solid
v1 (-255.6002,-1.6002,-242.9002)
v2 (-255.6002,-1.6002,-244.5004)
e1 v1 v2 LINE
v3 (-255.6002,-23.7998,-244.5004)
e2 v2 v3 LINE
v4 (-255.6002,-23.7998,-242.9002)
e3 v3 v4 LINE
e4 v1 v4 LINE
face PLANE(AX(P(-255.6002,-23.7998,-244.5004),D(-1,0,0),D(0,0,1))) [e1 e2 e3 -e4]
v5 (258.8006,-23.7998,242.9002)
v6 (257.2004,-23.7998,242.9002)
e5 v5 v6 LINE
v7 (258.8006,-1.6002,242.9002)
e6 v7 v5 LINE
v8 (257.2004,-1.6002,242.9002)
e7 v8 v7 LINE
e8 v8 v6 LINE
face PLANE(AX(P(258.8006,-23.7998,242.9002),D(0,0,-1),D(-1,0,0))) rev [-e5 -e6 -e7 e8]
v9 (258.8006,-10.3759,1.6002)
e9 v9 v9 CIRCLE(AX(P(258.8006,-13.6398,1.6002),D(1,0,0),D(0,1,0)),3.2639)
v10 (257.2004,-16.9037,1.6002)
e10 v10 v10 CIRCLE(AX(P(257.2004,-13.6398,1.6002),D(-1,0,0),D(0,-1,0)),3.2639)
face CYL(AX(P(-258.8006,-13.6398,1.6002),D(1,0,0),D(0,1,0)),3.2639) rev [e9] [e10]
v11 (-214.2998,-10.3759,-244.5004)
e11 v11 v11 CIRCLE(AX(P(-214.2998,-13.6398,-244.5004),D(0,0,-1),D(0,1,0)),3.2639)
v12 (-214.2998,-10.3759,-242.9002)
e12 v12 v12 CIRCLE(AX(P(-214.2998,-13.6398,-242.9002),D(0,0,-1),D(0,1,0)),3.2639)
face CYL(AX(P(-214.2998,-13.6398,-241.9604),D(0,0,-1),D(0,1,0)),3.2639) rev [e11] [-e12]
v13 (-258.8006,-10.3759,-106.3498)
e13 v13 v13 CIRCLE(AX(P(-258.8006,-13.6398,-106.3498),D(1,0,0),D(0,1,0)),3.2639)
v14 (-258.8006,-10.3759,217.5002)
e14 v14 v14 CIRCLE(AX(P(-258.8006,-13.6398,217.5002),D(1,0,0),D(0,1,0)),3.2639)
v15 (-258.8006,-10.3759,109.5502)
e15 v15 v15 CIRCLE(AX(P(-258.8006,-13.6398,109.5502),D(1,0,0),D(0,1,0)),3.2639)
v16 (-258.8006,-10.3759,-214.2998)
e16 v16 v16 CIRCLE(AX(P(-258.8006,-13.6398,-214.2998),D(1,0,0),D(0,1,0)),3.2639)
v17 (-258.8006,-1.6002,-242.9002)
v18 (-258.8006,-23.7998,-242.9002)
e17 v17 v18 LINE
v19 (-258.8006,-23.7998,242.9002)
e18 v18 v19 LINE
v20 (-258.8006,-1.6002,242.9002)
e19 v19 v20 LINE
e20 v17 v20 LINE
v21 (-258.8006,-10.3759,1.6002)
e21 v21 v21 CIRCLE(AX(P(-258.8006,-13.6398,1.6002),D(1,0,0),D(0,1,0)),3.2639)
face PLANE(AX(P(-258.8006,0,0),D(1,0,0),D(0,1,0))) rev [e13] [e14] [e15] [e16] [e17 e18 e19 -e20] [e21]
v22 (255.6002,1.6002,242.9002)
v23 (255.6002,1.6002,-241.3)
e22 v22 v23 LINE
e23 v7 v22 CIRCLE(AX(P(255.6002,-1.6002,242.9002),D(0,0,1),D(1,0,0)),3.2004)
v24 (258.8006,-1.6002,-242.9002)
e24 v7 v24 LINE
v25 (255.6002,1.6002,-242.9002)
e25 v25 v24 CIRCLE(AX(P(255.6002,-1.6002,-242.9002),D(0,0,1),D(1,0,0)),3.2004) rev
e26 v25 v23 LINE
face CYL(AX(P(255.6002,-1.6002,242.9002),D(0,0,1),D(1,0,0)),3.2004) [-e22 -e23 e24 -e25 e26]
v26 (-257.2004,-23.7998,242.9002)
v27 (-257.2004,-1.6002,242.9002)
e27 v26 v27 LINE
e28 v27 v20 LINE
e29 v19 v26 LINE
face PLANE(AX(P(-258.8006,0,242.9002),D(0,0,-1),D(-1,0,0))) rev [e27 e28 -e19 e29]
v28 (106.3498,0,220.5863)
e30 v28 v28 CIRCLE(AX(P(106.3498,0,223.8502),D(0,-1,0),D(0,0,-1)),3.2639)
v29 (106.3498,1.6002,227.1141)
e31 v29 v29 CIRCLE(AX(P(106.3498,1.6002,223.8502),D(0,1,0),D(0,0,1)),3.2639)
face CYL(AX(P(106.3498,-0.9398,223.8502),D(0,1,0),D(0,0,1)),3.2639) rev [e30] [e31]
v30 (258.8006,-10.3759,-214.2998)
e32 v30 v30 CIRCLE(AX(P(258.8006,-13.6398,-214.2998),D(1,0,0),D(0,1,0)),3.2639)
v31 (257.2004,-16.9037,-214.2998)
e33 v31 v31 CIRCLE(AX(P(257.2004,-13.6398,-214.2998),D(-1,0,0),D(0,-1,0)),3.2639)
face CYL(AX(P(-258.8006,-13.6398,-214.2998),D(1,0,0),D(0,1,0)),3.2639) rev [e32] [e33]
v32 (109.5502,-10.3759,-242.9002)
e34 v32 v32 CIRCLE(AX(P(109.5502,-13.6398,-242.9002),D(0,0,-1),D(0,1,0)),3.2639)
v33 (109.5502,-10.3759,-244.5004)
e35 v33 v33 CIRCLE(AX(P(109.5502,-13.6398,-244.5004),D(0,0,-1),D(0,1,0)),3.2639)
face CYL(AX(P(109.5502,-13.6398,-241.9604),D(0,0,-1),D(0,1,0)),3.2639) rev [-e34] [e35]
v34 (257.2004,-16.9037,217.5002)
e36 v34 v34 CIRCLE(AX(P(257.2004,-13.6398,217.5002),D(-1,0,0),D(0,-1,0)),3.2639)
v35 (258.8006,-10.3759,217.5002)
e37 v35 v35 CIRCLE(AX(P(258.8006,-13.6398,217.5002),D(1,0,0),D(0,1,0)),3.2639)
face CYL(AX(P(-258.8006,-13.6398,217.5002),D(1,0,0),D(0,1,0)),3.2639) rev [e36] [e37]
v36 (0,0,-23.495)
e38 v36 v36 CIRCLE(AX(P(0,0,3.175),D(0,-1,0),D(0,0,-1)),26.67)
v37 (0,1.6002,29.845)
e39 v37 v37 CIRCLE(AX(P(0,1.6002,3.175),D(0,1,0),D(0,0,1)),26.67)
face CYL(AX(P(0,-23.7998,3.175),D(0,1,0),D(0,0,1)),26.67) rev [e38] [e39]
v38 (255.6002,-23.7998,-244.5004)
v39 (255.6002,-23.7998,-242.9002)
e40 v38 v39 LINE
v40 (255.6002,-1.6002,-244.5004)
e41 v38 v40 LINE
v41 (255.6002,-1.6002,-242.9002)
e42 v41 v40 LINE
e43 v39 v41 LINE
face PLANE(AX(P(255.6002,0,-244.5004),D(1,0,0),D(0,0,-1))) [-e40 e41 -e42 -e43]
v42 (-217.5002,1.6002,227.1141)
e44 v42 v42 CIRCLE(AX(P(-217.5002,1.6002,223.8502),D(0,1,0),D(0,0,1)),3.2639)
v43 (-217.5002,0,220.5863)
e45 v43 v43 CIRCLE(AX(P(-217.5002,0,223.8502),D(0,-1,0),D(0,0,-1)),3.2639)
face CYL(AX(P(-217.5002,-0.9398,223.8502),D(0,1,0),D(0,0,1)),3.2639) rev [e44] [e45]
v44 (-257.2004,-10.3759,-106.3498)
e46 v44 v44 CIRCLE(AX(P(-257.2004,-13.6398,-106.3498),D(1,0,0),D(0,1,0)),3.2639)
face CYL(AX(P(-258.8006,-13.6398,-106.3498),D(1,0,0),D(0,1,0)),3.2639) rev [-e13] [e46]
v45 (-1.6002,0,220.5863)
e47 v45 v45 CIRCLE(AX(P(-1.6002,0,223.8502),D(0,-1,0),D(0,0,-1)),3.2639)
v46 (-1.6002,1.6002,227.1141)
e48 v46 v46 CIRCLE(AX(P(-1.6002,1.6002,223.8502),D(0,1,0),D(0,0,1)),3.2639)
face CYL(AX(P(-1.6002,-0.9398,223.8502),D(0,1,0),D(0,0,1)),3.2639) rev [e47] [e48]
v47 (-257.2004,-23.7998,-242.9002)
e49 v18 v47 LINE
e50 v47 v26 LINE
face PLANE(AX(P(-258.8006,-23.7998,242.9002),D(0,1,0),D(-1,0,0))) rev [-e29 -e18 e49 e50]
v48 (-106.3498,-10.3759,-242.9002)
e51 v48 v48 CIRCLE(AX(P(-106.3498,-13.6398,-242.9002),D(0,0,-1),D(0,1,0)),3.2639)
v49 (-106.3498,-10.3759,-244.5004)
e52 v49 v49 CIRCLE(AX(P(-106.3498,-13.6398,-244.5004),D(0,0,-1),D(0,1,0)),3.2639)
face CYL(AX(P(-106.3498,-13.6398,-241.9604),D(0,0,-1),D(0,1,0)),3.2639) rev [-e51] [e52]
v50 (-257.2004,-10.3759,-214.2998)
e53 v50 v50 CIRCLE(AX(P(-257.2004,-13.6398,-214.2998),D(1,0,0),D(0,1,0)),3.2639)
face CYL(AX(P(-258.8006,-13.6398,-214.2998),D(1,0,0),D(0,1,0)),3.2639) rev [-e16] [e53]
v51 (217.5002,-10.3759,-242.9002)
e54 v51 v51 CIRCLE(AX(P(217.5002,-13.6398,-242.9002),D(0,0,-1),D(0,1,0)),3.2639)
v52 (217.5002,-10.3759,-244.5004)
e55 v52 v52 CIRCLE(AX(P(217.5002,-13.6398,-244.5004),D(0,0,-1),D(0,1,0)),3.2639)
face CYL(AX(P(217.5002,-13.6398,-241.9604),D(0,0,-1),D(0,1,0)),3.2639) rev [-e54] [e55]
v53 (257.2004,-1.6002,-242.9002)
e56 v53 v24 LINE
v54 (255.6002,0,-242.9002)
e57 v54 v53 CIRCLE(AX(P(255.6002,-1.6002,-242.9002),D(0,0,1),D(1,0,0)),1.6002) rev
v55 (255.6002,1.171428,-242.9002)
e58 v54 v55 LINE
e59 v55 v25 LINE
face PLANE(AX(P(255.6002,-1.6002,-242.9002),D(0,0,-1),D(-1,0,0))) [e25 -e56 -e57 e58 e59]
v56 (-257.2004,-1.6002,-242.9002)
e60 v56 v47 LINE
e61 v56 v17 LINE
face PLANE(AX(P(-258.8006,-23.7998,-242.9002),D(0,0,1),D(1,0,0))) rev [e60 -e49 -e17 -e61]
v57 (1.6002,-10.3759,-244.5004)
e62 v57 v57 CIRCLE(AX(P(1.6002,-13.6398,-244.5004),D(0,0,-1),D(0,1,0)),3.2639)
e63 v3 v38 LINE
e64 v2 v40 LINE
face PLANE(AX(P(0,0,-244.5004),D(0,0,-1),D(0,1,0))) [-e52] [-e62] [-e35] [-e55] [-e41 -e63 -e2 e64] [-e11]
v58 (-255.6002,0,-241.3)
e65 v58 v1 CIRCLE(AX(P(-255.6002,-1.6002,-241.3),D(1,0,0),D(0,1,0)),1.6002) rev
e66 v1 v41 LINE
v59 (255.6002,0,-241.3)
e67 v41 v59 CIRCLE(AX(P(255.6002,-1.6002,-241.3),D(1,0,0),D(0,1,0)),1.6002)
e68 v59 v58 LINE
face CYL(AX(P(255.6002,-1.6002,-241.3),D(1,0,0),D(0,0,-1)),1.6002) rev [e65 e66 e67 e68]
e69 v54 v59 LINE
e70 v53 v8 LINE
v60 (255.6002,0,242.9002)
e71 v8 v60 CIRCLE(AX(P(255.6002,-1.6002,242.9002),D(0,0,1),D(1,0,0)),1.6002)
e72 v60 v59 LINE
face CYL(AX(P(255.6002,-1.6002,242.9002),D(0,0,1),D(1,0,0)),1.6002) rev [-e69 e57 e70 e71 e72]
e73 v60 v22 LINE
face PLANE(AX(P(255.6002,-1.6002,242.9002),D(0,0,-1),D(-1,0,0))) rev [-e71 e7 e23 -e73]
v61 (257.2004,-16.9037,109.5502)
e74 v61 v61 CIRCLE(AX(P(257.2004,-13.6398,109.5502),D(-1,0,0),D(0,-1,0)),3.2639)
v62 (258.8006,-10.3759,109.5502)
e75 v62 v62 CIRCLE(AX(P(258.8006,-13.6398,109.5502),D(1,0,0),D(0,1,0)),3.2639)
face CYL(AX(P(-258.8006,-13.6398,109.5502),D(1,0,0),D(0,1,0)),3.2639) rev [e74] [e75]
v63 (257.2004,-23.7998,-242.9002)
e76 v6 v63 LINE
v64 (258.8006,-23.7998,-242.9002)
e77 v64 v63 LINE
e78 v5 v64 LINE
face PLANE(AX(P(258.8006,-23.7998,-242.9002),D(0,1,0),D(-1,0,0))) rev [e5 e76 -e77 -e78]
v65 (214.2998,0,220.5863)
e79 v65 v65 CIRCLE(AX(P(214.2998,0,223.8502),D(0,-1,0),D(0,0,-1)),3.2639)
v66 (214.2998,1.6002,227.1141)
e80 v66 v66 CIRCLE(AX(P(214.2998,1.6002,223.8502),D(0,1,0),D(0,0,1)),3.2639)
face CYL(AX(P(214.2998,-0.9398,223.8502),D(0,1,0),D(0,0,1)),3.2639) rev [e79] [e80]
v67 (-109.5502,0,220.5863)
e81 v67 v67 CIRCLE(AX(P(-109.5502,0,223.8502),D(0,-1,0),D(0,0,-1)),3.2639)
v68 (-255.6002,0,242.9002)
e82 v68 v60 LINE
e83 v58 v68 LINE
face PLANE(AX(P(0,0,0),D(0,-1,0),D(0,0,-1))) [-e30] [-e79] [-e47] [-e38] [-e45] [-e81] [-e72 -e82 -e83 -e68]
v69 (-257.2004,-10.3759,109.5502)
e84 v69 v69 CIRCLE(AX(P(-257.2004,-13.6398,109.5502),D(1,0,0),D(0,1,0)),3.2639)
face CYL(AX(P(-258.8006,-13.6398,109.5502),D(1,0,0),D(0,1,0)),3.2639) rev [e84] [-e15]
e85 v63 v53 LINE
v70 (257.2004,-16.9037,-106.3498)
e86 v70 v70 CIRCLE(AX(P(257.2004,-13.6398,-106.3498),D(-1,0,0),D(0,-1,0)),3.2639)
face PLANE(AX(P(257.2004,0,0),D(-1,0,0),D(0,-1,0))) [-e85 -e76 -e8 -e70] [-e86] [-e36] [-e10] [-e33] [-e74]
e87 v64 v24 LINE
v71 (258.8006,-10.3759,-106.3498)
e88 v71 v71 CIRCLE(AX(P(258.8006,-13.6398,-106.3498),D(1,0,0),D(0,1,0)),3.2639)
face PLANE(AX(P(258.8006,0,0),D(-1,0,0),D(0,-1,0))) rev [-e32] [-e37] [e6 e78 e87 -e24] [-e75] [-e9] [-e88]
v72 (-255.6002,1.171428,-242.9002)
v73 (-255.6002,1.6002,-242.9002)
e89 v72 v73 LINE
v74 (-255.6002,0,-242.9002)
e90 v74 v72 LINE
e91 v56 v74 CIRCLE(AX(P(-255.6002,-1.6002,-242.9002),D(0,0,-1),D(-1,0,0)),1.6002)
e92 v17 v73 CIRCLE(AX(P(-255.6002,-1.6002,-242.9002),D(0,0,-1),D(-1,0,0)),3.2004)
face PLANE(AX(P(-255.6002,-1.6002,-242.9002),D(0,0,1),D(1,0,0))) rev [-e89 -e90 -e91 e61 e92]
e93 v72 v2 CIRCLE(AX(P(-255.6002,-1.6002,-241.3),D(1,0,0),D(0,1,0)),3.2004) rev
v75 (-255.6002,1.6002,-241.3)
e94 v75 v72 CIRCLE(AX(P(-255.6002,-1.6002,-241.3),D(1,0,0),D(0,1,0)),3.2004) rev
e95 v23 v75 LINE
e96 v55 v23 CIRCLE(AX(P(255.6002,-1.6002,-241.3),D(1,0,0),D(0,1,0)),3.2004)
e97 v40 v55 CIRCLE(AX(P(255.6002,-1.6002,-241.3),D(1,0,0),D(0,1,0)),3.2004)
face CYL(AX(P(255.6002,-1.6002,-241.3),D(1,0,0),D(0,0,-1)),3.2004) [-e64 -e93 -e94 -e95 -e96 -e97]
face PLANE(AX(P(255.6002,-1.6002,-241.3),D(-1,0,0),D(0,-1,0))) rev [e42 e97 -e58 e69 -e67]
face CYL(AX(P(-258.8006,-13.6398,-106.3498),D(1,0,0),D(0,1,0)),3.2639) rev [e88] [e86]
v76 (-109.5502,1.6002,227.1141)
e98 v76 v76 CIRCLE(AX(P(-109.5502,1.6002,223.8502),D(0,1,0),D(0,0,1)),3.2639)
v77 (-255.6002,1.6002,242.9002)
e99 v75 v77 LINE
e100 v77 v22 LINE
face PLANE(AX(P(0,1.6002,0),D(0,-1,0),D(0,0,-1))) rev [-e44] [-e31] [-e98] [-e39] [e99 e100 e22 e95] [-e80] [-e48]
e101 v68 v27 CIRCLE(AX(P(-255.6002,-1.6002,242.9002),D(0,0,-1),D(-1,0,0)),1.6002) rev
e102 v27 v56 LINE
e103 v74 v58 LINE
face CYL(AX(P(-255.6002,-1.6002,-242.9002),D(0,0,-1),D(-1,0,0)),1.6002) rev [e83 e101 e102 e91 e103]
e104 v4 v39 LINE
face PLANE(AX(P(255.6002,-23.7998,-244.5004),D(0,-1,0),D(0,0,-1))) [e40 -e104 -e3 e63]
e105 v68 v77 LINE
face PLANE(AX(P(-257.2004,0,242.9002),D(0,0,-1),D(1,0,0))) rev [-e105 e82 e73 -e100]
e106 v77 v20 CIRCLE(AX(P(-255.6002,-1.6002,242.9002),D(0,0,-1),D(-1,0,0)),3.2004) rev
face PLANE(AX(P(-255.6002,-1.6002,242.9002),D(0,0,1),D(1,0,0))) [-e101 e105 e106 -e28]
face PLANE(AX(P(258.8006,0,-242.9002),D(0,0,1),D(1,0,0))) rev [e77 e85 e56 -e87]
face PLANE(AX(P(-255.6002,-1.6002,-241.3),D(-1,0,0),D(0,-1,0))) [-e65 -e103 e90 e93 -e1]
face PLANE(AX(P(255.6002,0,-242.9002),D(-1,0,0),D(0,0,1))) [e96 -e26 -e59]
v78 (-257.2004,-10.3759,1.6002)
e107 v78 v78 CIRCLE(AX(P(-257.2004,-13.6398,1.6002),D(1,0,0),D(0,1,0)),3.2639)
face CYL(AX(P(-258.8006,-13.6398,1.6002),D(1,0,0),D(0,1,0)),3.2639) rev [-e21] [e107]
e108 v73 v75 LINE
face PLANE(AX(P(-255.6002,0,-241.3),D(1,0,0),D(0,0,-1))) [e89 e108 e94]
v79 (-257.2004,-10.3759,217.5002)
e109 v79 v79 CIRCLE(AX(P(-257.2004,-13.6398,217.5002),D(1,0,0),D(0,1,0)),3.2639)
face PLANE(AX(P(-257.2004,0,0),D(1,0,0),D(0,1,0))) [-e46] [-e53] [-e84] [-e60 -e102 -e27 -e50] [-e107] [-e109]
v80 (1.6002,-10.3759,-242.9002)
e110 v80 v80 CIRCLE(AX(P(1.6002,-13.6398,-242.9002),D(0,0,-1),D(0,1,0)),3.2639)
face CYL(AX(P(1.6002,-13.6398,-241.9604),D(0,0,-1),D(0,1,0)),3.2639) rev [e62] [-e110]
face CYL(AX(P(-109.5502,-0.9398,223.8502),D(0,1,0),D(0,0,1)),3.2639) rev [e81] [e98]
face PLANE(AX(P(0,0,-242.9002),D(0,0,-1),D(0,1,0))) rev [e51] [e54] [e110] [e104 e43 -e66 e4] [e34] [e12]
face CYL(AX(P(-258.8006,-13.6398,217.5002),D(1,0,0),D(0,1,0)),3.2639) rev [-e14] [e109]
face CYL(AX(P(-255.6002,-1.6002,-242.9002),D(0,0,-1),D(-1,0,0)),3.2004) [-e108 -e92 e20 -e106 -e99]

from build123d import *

# Parameters (mm, degrees)
SKETCH1_W                    = 514.4008
SKETCH1_H                    = 485.8004
BOSS_EXTRUDE1_DEPTH          = 1.6002
EDGE_FLANGE1_STRIP_W         = 9.6012
EDGE_FLANGE1_STRIP_H         = 1.6002
EDGE_FLANGE1_STRIP_CUT_DEPTH = 485.8004
EDGE_FLANGE1_DEPTH           = 485.8004
EDGE_FLANGE2_STRIP_W         = 9.6012
EDGE_FLANGE2_STRIP_H         = 1.6002
EDGE_FLANGE2_STRIP_CUT_DEPTH = 485.8004
EDGE_FLANGE2_DEPTH           = 485.8004
EDGE_FLANGE4_STRIP_W         = 9.6012
EDGE_FLANGE4_STRIP_H         = 1.6002
EDGE_FLANGE4_STRIP_CUT_DEPTH = 511.2004
EDGE_FLANGE4_DEPTH           = 511.2004
SKETCH18_R                   = 3.2639
CUT_EXTRUDE1_DEPTH           = 573.937935837
SKETCH19_R                   = 3.2639
CUT_EXTRUDE2_DEPTH           = 2.54
SKETCH20_R                   = 3.2639
CUT_EXTRUDE3_DEPTH           = 2.54
SKETCH21_R                   = 26.67
CUT_EXTRUDE4_DEPTH           = 357.936067329


# Sheet-metal steps are written as plain solids
with BuildPart() as part:
    # Sketch1 → Boss-Extrude1 (new body)
    with BuildSketch(Plane(origin=(0, 0, 0), x_dir=(1, 0, 0), z_dir=(0, 1, 0))):
        Rectangle(SKETCH1_W, SKETCH1_H)
    extrude(amount=BOSS_EXTRUDE1_DEPTH)

    # Edge-Flange1 strip (across the edge) → Edge-Flange1 strip cut (cut)
    with BuildSketch(Plane(origin=(-257.2004, 0, 242.9002), x_dir=(1, 0, 0), z_dir=(0, 0, -1))):
        with Locations((-3.2004, -0.8001)):
            Rectangle(EDGE_FLANGE1_STRIP_W, EDGE_FLANGE1_STRIP_H)
    extrude(amount=EDGE_FLANGE1_STRIP_CUT_DEPTH, mode=Mode.SUBTRACT)

    # Edge-Flange1 section (across the edge) → Edge-Flange1 (add)
    with BuildSketch(Plane(origin=(-257.2004, 0, 242.9002), x_dir=(1, 0, 0), z_dir=(0, 0, -1))):
        with BuildLine():
            Line((-1.6002, 1.6002), (-1.6002, 23.7998))
            Line((-1.6002, 23.7998), (0, 23.7998))
            Line((0, 23.7998), (0, 1.6002))
            ThreePointArc((0, 1.6002), (0.468687729, 0.468687729), (1.6002, 0))
            Line((1.6002, 0), (1.6002, -1.6002))
            ThreePointArc((1.6002, -1.6002), (-0.662824543, -0.662824543), (-1.6002, 1.6002))
        make_face()
    extrude(amount=EDGE_FLANGE1_DEPTH)

    # Edge-Flange2 strip (across the edge) → Edge-Flange2 strip cut (cut)
    with BuildSketch(Plane(origin=(257.2004, 0, -242.9002), x_dir=(-1, 0, 0), z_dir=(0, 0, 1))):
        with Locations((-3.2004, -0.8001)):
            Rectangle(EDGE_FLANGE2_STRIP_W, EDGE_FLANGE2_STRIP_H)
    extrude(amount=EDGE_FLANGE2_STRIP_CUT_DEPTH, mode=Mode.SUBTRACT)

    # Edge-Flange2 section (across the edge) → Edge-Flange2 (add)
    with BuildSketch(Plane(origin=(257.2004, 0, -242.9002), x_dir=(-1, 0, 0), z_dir=(0, 0, 1))):
        with BuildLine():
            Line((-1.6002, 1.6002), (-1.6002, 23.7998))
            Line((-1.6002, 23.7998), (0, 23.7998))
            Line((0, 23.7998), (0, 1.6002))
            ThreePointArc((0, 1.6002), (0.468687729, 0.468687729), (1.6002, 0))
            Line((1.6002, 0), (1.6002, -1.6002))
            ThreePointArc((1.6002, -1.6002), (-0.662824543, -0.662824543), (-1.6002, 1.6002))
        make_face()
    extrude(amount=EDGE_FLANGE2_DEPTH)

    # Edge-Flange4 strip (across the edge) → Edge-Flange4 strip cut (cut)
    with BuildSketch(Plane(origin=(-255.6002, 0, -242.9002), x_dir=(0, 0, 1), z_dir=(1, 0, 0))):
        with Locations((-3.2004, -0.8001)):
            Rectangle(EDGE_FLANGE4_STRIP_W, EDGE_FLANGE4_STRIP_H)
    extrude(amount=EDGE_FLANGE4_STRIP_CUT_DEPTH, mode=Mode.SUBTRACT)

    # Edge-Flange4 section (across the edge) → Edge-Flange4 (add)
    with BuildSketch(Plane(origin=(-255.6002, 0, -242.9002), x_dir=(0, 0, 1), z_dir=(1, 0, 0))):
        with BuildLine():
            Line((-1.6002, 1.6002), (-1.6002, 23.7998))
            Line((-1.6002, 23.7998), (0, 23.7998))
            Line((0, 23.7998), (0, 1.6002))
            ThreePointArc((0, 1.6002), (0.468687729, 0.468687729), (1.6002, 0))
            Line((1.6002, 0), (1.6002, -1.6002))
            ThreePointArc((1.6002, -1.6002), (-0.662824543, -0.662824543), (-1.6002, 1.6002))
        make_face()
    extrude(amount=EDGE_FLANGE4_DEPTH)

    # Sketch18 → Cut-Extrude1 (cut, through all)
    with BuildSketch(Plane(origin=(258.8006, 0, 0), x_dir=(0, 0, -1), z_dir=(1, 0, 0))):
        with Locations(Location((-217.5002, -13.6398, 0), (0, 0, 90))):
            Circle(SKETCH18_R)
        with Locations(Location((-109.5502, -13.6398, 0), (0, 0, 90))):
            Circle(SKETCH18_R)
        with Locations(Location((-1.6002, -13.6398, 0), (0, 0, 90))):
            Circle(SKETCH18_R)
        with Locations(Location((106.3498, -13.6398, 0), (0, 0, 90))):
            Circle(SKETCH18_R)
        with Locations(Location((214.2998, -13.6398, 0), (0, 0, 90))):
            Circle(SKETCH18_R)
    extrude(amount=-CUT_EXTRUDE1_DEPTH, mode=Mode.SUBTRACT)

    # Sketch19 → Cut-Extrude2 (cut)
    with BuildSketch(Plane(origin=(0, 0, -244.5004), x_dir=(-1, 0, 0), z_dir=(0, 0, -1))):
        with Locations(Location((-217.5002, -13.6398, 0), (0, 0, 90))):
            Circle(SKETCH19_R)
        with Locations(Location((-109.5502, -13.6398, 0), (0, 0, 90))):
            Circle(SKETCH19_R)
        with Locations(Location((-1.6002, -13.6398, 0), (0, 0, 90))):
            Circle(SKETCH19_R)
        with Locations(Location((106.3498, -13.6398, 0), (0, 0, 90))):
            Circle(SKETCH19_R)
        with Locations(Location((214.2998, -13.6398, 0), (0, 0, 90))):
            Circle(SKETCH19_R)
    extrude(amount=-CUT_EXTRUDE2_DEPTH, mode=Mode.SUBTRACT)

    # Sketch20 → Cut-Extrude3 (cut)
    with BuildSketch(Plane(origin=(0, 1.6002, 0), x_dir=(1, 0, 0), z_dir=(0, 1, 0))):
        with Locations(Location((-217.5002, -223.8502, 0), (0, 0, 270))):
            Circle(SKETCH20_R)
        with Locations(Location((-109.5502, -223.8502, 0), (0, 0, 270))):
            Circle(SKETCH20_R)
        with Locations(Location((-1.6002, -223.8502, 0), (0, 0, 270))):
            Circle(SKETCH20_R)
        with Locations(Location((106.3498, -223.8502, 0), (0, 0, 270))):
            Circle(SKETCH20_R)
        with Locations(Location((214.2998, -223.8502, 0), (0, 0, 270))):
            Circle(SKETCH20_R)
    extrude(amount=-CUT_EXTRUDE3_DEPTH, mode=Mode.SUBTRACT)

    # Sketch21 → Cut-Extrude4 (cut, through all)
    with BuildSketch(Plane(origin=(0, 1.6002, 0), x_dir=(1, 0, 0), z_dir=(0, 1, 0))):
        with Locations(Location((0, -3.175, 0), (0, 0, 270))):
            Circle(SKETCH21_R)
    extrude(amount=-CUT_EXTRUDE4_DEPTH, mode=Mode.SUBTRACT)


solid = part.part
